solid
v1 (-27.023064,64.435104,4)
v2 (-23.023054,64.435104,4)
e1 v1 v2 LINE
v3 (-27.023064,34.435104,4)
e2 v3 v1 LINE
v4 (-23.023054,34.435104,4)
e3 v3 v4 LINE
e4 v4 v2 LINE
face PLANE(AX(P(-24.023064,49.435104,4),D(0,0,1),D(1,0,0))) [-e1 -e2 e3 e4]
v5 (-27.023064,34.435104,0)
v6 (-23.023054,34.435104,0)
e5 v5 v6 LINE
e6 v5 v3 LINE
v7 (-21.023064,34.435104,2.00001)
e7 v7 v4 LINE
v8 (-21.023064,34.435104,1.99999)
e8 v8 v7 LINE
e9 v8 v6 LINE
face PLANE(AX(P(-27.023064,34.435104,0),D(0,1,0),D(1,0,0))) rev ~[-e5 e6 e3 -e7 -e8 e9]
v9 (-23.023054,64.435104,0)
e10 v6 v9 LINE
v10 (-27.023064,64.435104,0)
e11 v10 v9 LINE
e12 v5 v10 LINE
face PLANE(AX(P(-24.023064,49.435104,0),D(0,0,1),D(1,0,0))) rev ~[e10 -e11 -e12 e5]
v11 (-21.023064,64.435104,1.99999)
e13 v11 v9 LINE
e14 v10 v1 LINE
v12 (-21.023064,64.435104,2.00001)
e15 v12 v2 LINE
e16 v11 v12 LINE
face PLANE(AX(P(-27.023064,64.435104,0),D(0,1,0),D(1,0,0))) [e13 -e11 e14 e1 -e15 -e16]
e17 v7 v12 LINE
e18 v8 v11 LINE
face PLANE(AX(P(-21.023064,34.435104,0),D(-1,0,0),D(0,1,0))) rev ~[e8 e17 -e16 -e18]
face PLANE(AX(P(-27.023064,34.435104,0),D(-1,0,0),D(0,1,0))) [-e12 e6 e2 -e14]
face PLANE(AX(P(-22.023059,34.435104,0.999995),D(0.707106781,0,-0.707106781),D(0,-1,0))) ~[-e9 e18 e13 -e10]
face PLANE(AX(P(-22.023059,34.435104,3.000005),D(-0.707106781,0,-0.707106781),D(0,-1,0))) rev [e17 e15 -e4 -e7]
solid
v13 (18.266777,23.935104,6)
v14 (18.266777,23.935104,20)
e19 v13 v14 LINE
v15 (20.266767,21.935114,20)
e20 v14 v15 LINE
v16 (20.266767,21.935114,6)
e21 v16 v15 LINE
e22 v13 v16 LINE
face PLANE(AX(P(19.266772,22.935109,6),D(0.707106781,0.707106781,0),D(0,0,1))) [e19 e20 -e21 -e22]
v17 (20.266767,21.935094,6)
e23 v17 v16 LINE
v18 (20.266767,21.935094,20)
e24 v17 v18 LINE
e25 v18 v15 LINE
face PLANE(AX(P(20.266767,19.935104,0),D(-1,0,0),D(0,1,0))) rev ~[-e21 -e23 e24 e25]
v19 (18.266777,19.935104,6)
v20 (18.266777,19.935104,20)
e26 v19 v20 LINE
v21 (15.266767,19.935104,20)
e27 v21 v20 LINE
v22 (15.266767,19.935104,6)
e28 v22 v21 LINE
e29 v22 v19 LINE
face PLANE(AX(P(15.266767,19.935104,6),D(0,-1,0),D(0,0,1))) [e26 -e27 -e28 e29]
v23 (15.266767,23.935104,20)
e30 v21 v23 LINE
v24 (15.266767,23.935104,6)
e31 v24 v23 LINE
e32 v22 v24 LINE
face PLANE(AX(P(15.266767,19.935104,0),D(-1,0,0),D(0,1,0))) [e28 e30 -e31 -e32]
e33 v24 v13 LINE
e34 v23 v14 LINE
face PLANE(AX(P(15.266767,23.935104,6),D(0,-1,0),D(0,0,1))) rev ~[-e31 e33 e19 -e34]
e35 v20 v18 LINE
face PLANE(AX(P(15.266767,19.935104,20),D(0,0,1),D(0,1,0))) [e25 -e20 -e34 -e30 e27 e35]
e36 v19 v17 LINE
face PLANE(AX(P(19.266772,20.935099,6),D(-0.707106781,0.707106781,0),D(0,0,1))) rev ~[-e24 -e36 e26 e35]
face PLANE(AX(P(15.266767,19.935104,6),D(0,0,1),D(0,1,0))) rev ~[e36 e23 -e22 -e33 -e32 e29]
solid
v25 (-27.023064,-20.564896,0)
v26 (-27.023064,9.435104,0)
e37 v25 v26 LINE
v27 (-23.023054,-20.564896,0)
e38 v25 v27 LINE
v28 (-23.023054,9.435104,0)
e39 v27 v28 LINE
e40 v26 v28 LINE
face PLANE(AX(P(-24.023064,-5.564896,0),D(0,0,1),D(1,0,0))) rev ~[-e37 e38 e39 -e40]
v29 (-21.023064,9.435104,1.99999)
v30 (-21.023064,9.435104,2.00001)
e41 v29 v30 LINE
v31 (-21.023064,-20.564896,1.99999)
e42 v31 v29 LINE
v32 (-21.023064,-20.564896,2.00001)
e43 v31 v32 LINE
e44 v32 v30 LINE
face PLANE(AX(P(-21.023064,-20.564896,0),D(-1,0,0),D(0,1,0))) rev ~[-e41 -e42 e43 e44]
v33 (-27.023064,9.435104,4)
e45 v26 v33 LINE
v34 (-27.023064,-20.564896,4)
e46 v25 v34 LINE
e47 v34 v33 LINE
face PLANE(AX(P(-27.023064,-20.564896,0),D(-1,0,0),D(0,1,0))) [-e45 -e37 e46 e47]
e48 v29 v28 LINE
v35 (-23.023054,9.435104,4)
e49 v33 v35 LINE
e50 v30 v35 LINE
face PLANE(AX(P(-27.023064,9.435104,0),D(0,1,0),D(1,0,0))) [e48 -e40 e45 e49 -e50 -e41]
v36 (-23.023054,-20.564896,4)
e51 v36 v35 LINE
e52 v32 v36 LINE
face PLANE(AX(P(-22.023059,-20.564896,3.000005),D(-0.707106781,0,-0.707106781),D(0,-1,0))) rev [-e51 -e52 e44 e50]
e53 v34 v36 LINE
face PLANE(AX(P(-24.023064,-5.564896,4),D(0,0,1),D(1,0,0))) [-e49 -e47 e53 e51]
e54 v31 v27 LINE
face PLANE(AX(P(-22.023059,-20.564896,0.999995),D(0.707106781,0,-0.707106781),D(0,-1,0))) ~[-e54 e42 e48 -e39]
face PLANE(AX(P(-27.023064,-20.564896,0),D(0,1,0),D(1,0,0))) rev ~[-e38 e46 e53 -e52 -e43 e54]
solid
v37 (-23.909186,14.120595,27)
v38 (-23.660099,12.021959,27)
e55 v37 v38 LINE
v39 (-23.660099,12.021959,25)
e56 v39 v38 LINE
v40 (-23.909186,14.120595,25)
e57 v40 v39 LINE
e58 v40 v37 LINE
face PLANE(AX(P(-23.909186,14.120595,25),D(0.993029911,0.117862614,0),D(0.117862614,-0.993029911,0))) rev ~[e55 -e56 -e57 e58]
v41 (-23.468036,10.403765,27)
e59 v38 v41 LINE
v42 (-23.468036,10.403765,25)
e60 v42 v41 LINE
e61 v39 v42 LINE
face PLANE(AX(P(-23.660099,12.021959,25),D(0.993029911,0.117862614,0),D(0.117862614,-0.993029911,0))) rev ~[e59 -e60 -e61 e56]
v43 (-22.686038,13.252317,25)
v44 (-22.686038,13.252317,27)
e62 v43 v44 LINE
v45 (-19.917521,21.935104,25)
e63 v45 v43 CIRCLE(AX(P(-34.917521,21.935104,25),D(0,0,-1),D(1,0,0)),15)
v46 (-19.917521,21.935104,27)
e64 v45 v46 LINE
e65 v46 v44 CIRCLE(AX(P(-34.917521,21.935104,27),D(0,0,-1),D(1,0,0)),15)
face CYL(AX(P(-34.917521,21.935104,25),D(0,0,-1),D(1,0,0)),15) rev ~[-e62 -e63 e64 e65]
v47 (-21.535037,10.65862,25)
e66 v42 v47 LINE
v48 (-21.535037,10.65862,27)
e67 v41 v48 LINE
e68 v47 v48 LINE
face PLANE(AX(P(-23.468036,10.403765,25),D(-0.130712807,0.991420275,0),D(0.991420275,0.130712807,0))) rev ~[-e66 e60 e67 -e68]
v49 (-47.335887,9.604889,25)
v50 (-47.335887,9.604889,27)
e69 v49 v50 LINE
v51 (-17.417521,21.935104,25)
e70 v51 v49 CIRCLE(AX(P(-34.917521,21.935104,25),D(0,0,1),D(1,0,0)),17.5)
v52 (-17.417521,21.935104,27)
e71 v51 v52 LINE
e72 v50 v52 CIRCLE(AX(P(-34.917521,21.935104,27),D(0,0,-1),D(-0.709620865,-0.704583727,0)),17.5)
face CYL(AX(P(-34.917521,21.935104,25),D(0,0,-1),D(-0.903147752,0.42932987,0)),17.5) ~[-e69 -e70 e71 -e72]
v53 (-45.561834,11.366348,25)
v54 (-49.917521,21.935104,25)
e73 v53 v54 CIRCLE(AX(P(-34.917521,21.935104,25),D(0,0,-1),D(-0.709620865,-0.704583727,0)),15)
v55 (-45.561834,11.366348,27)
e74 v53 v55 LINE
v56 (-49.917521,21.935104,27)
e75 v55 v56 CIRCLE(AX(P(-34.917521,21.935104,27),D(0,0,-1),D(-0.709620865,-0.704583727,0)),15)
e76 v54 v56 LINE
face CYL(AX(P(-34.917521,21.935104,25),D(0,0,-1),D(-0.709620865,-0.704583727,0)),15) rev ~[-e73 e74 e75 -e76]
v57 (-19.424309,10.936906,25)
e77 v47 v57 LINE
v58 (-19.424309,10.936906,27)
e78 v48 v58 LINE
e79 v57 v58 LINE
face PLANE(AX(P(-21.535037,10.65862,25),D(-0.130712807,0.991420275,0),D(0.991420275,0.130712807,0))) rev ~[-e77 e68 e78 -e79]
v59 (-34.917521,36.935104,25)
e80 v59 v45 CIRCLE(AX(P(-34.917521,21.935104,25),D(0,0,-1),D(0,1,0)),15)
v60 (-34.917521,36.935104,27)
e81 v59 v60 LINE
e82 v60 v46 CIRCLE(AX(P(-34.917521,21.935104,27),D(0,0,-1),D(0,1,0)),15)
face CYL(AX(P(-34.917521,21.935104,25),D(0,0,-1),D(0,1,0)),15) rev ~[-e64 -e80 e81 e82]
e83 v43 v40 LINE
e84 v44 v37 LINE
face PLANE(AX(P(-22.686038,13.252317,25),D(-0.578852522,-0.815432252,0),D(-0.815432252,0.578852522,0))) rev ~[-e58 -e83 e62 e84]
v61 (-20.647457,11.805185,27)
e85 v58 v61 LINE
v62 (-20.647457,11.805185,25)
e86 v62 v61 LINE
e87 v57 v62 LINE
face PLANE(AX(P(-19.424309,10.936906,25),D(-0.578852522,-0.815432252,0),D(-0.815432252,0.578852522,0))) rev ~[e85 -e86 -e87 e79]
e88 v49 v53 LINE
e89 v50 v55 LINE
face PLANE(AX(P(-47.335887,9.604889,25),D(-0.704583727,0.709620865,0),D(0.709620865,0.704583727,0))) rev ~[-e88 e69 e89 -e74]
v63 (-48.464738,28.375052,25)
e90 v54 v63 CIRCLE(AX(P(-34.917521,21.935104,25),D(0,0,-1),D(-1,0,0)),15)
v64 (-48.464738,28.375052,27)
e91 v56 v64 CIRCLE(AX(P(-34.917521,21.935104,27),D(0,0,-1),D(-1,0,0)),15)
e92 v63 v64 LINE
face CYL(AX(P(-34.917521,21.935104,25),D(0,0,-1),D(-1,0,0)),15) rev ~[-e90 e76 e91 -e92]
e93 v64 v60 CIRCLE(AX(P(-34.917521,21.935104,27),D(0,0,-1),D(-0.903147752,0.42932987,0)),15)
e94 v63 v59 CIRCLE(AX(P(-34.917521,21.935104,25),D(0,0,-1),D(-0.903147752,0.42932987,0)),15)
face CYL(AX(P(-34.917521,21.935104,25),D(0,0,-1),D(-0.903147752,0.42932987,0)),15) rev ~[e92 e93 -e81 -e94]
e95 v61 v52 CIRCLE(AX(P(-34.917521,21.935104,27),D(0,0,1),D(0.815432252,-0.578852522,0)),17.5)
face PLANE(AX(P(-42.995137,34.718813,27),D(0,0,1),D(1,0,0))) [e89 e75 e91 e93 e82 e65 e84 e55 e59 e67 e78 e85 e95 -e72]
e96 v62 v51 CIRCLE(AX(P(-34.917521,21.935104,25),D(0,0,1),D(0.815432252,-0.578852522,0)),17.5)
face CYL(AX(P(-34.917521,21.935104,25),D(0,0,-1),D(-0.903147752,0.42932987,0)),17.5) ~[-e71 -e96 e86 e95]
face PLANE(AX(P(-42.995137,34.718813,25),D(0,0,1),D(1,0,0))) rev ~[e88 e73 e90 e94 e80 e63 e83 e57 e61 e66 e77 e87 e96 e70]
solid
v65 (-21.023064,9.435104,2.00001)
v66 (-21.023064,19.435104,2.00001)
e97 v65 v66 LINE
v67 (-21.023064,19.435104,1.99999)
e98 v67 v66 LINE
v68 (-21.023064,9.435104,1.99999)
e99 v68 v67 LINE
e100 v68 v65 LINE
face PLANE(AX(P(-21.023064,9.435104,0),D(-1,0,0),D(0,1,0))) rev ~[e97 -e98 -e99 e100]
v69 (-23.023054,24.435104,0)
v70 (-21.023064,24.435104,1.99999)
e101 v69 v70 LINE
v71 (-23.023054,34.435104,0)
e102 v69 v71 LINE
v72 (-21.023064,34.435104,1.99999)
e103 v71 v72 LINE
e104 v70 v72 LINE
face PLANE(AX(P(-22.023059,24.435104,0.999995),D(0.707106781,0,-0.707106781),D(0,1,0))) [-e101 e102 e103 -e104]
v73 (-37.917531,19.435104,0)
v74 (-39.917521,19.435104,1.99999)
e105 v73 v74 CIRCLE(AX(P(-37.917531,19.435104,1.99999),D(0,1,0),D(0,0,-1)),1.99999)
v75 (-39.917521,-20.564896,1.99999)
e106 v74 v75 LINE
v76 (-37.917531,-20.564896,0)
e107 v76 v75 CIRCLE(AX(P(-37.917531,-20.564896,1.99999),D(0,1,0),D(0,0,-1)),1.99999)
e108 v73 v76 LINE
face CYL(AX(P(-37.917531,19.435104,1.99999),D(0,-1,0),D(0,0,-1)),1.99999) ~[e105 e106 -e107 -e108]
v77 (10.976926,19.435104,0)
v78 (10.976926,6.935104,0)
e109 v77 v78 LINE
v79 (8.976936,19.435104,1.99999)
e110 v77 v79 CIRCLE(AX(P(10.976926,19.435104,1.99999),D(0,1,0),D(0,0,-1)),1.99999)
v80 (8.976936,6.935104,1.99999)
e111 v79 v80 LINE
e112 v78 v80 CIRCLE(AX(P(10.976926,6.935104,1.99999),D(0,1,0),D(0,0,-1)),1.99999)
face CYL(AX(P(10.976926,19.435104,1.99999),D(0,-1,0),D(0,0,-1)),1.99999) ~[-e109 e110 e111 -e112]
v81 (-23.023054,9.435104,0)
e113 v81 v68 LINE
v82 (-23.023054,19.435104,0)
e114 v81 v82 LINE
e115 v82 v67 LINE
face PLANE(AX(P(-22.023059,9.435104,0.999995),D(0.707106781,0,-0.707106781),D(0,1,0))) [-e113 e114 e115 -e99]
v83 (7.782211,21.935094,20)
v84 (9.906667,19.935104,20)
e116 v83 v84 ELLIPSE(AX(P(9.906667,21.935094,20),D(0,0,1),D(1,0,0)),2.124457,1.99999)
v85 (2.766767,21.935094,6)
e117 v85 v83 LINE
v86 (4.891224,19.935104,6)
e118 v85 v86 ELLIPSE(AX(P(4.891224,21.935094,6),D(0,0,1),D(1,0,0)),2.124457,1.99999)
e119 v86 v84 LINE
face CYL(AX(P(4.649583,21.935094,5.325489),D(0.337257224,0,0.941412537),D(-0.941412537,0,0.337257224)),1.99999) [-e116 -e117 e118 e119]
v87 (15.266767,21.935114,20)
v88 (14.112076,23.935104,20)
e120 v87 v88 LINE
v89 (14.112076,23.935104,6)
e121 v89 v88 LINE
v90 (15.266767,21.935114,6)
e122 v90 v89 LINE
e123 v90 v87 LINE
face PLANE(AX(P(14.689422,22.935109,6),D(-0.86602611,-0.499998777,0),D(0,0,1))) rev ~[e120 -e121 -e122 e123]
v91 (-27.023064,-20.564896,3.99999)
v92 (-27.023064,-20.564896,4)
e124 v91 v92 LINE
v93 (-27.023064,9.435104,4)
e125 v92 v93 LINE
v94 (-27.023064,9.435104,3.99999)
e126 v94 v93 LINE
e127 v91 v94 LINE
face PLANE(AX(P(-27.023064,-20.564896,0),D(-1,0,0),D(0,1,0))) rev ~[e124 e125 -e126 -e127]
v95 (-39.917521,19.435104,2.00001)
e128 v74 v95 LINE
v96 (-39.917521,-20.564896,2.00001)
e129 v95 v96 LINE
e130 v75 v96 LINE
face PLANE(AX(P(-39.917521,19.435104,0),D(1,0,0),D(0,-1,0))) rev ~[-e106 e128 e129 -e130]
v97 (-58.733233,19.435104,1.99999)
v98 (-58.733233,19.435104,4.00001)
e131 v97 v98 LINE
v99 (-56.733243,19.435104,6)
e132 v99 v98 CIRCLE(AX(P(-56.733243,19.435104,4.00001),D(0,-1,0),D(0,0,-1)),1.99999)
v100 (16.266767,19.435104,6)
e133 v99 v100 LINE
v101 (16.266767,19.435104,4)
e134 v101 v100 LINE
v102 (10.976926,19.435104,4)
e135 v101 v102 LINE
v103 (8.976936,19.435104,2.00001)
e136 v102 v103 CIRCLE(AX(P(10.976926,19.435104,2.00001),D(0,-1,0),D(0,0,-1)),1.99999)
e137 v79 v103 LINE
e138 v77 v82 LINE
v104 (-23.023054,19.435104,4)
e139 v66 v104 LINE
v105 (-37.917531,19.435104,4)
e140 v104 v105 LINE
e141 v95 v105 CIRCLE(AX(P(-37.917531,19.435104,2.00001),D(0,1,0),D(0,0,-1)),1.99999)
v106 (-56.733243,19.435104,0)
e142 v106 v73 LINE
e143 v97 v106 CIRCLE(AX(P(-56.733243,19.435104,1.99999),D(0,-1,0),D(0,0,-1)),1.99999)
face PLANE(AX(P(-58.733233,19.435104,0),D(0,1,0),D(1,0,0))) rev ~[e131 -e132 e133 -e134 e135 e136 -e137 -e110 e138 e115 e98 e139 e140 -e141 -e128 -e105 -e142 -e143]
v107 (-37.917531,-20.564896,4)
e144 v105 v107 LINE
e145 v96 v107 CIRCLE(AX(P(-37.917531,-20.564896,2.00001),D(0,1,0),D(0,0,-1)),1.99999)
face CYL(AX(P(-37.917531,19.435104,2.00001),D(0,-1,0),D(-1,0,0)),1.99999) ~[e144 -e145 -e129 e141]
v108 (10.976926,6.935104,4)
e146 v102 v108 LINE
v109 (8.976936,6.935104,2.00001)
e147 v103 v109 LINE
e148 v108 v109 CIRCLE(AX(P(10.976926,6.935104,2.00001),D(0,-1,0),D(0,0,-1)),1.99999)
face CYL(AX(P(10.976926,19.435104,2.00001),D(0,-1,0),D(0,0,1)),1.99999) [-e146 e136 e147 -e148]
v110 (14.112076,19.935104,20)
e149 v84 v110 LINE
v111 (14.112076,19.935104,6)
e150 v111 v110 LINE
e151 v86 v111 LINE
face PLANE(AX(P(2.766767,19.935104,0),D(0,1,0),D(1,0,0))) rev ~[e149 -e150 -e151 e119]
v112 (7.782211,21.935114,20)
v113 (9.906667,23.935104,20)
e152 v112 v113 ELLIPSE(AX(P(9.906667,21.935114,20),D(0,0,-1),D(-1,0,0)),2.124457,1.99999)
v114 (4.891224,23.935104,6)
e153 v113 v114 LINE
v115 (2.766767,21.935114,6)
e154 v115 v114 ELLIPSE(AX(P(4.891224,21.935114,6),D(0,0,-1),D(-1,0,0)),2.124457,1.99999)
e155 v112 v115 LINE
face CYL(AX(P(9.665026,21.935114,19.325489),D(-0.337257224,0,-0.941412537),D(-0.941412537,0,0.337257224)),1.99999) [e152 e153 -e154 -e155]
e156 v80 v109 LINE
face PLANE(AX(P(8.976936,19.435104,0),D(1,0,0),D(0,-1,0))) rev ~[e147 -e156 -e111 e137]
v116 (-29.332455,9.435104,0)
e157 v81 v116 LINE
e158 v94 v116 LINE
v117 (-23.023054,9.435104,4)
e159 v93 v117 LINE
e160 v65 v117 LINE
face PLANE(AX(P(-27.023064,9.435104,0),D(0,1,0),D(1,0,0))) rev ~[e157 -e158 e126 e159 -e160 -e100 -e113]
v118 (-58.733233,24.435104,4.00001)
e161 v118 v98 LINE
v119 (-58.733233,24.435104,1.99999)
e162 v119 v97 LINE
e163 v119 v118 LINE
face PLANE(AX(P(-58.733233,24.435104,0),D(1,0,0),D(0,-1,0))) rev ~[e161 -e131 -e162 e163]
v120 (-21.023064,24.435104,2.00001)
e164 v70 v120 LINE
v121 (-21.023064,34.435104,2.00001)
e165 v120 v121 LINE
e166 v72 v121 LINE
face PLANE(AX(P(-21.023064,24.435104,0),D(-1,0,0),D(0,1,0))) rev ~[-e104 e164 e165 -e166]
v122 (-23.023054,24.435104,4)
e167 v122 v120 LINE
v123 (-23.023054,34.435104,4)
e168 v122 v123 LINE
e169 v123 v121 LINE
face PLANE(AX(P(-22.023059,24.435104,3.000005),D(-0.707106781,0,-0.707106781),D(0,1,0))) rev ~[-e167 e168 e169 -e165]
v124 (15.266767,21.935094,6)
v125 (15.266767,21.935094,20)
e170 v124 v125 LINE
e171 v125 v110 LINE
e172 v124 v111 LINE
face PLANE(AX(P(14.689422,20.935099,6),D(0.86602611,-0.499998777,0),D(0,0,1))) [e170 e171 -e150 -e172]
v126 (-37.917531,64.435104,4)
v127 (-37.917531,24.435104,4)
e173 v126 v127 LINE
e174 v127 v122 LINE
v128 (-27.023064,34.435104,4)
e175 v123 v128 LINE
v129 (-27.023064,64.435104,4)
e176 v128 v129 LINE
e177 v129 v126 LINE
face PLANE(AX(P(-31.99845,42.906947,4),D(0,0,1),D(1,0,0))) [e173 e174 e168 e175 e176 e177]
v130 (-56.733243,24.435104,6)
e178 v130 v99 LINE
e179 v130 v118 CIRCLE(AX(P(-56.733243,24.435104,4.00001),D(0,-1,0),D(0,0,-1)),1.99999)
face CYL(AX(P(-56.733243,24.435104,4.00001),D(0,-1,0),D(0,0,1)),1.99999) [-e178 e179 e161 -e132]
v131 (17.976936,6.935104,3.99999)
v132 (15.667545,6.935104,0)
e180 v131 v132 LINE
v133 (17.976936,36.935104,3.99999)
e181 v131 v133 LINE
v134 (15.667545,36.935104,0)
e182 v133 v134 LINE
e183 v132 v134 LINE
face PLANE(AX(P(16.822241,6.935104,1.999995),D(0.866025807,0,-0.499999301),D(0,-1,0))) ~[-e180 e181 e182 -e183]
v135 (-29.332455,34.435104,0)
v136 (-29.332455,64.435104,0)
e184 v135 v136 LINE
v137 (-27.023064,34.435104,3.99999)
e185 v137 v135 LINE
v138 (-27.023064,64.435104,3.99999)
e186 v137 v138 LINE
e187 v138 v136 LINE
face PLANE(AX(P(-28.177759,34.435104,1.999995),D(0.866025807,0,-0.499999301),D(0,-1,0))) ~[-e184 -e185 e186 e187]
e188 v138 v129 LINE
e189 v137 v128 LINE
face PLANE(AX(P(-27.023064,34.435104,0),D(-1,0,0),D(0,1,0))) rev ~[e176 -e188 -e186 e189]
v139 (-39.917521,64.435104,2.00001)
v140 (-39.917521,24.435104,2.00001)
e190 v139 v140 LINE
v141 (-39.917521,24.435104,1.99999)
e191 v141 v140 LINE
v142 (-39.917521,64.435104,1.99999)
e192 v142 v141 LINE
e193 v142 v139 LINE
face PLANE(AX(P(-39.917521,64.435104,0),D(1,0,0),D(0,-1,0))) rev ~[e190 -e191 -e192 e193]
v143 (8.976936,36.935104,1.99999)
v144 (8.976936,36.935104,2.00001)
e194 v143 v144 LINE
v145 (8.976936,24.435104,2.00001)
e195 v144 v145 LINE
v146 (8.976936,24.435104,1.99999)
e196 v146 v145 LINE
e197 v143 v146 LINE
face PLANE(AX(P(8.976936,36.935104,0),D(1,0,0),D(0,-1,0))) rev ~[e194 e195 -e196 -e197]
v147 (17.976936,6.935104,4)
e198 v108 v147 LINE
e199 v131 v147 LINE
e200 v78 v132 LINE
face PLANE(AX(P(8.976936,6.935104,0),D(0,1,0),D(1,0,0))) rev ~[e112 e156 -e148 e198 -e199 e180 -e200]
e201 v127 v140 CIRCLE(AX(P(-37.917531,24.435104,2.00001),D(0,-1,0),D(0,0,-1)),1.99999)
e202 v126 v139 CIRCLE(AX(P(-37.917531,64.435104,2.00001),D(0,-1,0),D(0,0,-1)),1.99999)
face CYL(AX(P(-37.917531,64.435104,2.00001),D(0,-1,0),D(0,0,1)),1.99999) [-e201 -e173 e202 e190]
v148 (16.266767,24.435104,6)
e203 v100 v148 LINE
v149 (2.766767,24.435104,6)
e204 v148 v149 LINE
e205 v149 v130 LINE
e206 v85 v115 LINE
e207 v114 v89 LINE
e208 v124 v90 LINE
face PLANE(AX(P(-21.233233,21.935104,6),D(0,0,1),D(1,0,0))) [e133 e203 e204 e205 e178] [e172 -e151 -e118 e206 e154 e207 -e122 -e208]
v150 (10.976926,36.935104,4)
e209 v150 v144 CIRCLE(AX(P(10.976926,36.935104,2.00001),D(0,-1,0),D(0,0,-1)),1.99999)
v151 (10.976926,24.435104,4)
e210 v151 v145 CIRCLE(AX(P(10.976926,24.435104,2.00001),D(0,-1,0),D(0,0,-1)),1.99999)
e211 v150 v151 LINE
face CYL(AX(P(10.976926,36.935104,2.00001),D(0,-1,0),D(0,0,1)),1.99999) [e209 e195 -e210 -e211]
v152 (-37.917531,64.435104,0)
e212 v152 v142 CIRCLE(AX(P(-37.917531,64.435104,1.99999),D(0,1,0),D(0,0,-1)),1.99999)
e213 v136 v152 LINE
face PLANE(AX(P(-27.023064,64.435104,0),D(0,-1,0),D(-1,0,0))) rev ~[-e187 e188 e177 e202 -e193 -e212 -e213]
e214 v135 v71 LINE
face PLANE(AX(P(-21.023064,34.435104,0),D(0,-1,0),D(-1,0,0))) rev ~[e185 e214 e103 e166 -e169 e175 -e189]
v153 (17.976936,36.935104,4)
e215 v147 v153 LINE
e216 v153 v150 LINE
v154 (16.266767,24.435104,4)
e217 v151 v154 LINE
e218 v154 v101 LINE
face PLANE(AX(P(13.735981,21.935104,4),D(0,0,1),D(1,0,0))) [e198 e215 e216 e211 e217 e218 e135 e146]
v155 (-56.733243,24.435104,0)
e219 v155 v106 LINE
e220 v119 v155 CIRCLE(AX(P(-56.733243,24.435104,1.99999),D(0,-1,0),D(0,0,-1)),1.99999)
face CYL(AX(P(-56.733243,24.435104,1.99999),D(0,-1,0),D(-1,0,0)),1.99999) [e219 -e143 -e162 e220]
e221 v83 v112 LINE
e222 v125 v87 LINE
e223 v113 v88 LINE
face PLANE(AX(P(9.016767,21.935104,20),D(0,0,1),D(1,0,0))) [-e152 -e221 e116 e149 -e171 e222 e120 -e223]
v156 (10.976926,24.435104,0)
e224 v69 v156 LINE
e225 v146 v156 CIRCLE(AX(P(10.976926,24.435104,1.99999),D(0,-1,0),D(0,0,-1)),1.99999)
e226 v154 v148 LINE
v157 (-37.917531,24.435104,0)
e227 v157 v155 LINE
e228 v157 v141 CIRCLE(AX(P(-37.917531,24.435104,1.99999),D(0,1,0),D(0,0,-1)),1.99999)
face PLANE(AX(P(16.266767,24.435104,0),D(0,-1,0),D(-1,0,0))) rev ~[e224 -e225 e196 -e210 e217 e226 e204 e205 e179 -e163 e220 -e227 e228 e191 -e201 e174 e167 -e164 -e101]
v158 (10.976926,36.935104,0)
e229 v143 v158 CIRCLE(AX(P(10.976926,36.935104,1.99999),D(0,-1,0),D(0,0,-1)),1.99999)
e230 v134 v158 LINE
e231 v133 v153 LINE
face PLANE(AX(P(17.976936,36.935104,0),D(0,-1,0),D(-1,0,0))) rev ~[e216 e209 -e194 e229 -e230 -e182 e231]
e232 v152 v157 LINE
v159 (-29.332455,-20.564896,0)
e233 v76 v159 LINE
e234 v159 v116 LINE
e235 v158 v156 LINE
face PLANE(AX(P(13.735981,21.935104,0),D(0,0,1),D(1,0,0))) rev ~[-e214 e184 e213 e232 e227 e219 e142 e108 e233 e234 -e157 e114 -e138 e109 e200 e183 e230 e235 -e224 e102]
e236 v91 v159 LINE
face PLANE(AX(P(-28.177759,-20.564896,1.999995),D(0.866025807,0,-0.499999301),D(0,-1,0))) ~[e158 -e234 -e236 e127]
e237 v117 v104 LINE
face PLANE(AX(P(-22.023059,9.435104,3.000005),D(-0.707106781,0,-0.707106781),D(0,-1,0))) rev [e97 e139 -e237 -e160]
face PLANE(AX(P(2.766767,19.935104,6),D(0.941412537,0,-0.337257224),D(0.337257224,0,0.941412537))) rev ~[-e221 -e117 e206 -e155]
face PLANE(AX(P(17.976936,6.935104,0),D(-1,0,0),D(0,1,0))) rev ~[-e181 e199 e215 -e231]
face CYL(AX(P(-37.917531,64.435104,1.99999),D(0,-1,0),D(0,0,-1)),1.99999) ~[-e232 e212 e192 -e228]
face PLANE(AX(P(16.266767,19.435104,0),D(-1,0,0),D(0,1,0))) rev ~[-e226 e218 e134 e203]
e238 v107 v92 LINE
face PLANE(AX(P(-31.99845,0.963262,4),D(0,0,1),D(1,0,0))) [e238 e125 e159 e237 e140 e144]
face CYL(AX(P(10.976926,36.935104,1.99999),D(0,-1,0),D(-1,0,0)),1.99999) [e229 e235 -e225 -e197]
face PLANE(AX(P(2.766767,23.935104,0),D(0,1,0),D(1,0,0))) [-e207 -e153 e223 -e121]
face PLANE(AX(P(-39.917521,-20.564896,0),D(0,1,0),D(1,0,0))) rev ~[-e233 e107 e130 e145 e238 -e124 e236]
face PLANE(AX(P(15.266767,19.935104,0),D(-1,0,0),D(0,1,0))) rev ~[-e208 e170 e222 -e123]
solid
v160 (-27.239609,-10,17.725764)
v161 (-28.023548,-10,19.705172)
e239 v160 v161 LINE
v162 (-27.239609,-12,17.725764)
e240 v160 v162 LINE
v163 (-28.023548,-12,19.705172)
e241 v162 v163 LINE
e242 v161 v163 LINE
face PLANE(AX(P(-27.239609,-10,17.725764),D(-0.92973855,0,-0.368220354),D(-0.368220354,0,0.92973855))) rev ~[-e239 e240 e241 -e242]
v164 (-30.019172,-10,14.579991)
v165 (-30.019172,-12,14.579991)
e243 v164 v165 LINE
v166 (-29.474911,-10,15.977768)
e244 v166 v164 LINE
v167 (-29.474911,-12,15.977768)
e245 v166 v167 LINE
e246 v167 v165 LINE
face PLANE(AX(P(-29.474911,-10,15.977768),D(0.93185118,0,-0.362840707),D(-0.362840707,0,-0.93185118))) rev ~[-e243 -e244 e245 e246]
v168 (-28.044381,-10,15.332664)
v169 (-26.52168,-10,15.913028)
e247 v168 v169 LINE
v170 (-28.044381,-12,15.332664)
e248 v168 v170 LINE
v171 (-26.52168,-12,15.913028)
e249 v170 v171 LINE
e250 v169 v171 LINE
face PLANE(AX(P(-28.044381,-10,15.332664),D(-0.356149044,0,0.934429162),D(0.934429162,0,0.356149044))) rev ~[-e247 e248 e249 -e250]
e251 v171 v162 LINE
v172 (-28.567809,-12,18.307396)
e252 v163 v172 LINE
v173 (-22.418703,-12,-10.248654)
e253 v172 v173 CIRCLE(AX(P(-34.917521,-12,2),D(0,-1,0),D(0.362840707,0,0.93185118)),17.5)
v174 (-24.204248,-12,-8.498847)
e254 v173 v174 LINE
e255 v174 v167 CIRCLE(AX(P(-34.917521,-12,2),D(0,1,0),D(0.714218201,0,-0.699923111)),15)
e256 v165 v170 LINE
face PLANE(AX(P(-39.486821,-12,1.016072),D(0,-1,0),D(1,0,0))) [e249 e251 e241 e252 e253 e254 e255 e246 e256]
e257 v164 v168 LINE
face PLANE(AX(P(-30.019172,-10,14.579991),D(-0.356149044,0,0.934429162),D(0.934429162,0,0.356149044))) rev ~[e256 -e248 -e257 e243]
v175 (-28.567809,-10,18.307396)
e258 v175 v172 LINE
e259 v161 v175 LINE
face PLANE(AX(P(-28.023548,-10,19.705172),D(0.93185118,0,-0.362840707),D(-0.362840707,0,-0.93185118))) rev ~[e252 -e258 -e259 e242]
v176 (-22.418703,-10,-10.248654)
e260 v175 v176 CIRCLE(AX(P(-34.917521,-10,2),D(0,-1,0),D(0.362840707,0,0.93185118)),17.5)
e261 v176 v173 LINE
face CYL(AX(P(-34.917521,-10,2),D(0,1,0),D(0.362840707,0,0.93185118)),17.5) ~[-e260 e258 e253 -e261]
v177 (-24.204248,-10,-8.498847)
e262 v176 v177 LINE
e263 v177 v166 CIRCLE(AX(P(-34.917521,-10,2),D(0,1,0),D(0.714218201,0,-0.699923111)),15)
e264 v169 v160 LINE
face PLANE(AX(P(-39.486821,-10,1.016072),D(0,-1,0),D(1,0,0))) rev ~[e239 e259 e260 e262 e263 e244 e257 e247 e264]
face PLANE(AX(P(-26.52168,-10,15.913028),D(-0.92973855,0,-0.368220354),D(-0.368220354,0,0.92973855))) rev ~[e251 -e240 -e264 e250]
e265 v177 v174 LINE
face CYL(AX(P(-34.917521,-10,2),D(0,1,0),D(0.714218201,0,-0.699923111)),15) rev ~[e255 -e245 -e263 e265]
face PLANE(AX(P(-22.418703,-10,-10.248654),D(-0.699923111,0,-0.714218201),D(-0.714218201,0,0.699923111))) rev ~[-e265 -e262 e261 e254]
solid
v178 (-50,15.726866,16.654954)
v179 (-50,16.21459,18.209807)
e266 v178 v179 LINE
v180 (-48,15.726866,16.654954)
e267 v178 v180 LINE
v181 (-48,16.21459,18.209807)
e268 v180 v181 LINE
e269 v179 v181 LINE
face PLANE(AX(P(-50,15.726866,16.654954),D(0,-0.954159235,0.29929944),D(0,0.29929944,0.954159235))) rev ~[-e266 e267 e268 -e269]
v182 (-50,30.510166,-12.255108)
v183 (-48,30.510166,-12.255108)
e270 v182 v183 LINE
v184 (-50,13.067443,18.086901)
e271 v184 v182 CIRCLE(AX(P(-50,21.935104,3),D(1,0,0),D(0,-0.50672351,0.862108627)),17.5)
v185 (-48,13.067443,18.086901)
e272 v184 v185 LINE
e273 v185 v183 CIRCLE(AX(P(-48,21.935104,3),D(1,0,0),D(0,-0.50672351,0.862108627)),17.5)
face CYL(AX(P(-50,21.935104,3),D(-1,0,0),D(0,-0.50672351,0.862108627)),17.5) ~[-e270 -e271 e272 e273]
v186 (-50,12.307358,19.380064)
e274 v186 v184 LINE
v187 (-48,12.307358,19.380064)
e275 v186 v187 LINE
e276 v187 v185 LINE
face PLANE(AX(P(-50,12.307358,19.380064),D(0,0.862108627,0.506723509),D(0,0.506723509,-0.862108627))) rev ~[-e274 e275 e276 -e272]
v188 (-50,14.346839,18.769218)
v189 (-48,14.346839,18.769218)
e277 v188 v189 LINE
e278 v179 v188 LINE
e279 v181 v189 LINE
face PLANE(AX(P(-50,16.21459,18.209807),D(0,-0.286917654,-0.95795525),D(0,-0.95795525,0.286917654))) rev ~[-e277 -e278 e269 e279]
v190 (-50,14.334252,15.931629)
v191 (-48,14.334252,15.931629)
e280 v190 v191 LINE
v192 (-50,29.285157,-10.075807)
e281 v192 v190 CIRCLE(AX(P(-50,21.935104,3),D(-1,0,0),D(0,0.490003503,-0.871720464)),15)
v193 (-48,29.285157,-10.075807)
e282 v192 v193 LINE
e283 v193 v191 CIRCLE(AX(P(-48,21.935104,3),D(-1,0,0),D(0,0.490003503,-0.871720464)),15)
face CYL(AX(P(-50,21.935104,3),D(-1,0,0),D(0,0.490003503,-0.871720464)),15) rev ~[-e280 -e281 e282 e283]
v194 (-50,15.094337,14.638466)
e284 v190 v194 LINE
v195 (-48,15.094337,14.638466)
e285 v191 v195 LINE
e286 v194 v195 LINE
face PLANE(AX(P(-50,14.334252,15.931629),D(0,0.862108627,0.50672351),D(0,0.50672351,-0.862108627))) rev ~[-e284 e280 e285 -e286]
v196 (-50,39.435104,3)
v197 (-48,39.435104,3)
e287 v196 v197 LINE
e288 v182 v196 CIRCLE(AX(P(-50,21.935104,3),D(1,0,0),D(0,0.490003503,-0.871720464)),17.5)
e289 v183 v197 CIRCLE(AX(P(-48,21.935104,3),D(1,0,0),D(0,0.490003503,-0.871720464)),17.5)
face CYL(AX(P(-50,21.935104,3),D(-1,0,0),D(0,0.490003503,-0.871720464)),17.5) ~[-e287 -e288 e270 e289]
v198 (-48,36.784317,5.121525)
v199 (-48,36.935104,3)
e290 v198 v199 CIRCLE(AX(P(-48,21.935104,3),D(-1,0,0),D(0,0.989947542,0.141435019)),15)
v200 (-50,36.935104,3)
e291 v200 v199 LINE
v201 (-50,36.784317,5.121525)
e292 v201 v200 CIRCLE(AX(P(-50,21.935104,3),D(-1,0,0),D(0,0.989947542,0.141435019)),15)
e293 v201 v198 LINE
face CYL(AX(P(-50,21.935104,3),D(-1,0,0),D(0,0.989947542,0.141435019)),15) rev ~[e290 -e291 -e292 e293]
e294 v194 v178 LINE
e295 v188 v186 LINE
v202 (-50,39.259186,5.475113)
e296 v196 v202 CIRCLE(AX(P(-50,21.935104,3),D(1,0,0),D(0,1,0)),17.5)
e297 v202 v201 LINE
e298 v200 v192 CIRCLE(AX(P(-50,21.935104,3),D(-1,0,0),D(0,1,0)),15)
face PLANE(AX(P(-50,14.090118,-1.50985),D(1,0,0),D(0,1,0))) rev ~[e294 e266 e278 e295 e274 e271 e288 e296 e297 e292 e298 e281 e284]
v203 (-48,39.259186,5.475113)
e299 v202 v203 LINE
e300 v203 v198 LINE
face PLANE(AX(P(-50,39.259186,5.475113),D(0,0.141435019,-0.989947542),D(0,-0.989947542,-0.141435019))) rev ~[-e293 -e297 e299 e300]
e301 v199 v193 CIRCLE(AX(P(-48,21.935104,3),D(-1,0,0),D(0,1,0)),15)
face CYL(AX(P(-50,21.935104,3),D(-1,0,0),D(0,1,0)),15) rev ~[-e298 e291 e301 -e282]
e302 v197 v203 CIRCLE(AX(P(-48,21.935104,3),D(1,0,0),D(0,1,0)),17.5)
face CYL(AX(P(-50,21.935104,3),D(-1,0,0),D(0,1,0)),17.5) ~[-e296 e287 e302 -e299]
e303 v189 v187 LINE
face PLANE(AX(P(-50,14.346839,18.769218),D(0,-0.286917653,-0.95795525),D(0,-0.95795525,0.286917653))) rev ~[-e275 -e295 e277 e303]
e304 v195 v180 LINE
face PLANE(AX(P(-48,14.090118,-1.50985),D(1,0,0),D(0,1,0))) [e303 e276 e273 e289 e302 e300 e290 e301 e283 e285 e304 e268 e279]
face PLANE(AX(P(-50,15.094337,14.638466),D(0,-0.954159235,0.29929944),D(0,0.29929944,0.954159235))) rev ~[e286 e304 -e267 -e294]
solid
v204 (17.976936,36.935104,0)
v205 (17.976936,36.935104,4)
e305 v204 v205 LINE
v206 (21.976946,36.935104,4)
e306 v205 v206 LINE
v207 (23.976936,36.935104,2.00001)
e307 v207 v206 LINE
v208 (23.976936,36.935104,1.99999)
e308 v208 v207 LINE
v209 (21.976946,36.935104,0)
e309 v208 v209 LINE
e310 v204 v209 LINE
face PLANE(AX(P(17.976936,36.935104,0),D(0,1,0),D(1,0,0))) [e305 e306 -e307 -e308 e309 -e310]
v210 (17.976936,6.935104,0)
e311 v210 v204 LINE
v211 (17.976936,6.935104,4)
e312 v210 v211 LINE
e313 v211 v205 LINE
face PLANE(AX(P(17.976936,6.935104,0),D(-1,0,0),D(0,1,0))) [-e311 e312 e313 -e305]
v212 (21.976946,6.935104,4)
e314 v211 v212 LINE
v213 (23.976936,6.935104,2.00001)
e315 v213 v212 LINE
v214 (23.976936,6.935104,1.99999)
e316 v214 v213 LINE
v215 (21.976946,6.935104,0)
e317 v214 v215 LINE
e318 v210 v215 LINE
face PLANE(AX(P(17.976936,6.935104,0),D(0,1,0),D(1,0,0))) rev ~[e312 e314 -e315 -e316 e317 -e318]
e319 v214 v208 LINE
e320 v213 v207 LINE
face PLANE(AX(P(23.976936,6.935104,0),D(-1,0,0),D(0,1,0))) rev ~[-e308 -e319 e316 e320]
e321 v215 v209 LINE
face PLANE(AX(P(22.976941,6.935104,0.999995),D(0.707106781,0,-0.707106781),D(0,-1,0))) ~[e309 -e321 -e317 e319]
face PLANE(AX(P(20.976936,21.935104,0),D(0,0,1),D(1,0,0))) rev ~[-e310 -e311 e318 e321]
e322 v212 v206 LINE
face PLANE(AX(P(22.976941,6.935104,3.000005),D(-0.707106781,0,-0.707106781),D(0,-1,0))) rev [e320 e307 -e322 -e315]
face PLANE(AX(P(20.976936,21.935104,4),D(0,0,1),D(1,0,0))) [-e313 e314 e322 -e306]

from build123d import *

# Parameters (mm, degrees)
F0_W        = 12.5
F0_H        = 4
F1_DEPTH    = 6
F2_DEPTH    = 4
F0_W_2      = 6
F0_H_2      = 30
F3_DEPTH    = 4
F4_DEPTH    = 20
F7_DEPTH    = 25
F8_DEPTH    = 5
F9_R        = 1.99999
F10_SIZE    = 1.99999
F10_2_SIZE  = 1.99999
F10_3_SIZE  = 1.99999
F10_4_SIZE  = 1.99999
F10_5_SIZE  = 1.99999
F11_SIZE2   = 2.309391
F11_SIZE    = 3.99999
F11_2_SIZE2 = 2.309391
F11_2_SIZE  = 3.99999
F11_3_SIZE2 = 2.309391
F11_3_SIZE  = 3.99999
F12_SIZE2   = 1.154691
F12_SIZE    = 1.99999
F15_DEPTH   = 2
F18_DEPTH   = 2
F21_DEPTH   = 2


# Not quite as in the source:
# - a fillet or chamfer is up to 0.001 mm smaller than in the source, because OpenCascade refuses the exact size


with BuildPart() as f1:
    # F0 (on Top) → F1 (new body)
    with BuildSketch(Plane.XY):
        Polygon((-58.7332326337, 24.4351043343), (-58.7332326337, 19.4351043343), (-39.9175214512, 19.4351043343), (-21.0230639726, 19.4351043343), (8.9769360274, 19.4351043343), (16.2667673663, 19.4351043343), (16.2667673663, 24.4351043343), (8.9769360274, 24.4351043343), (-21.0230639726, 24.4351043343), (-39.9175214512, 24.4351043343), align=None)
        with Locations((9.0167673663, 21.9351043343)):
            Rectangle(F0_W, F0_H, mode=Mode.SUBTRACT)
    extrude(amount=F1_DEPTH)

    # F0 (on Top) → F2 (join)
    with BuildSketch(Plane.XY):
        Polygon((-21.0230639726, 19.4351043343), (-39.9175214512, 19.4351043343), (-39.9175214512, -20.5648956657), (-27.0230639726, -20.5648956657), (-27.0230639726, 9.4351043343), (-21.0230639726, 9.4351043343), align=None)
        Polygon((-39.9175214512, 64.4351043343), (-39.9175214512, 24.4351043343), (-21.0230639726, 24.4351043343), (-21.0230639726, 34.4351043343), (-27.0230639726, 34.4351043343), (-27.0230639726, 64.4351043343), align=None)
        Polygon((16.2667673663, 19.4351043343), (8.9769360274, 19.4351043343), (8.9769360274, 6.9351043343), (17.9769360274, 6.9351043343), (17.9769360274, 36.9351043343), (8.9769360274, 36.9351043343), (8.9769360274, 24.4351043343), (16.2667673663, 24.4351043343), align=None)
    extrude(amount=F2_DEPTH)

    # F0 (on Top) → F4 (join)
    with BuildSketch(Plane.XY):
        with Locations((9.0167673663, 21.9351043343)):
            Rectangle(F0_W, F0_H)
    extrude(amount=F4_DEPTH)

    # F6 (on offset) → F7 (cut)
    with BuildSketch(Plane.XZ.offset(-19.9351043343)):
        Polygon((7.7822105959, 20), (2.7667673663, 20), (2.7667673663, 6), align=None)
    extrude(amount=-F7_DEPTH, mode=Mode.SUBTRACT)


with BuildPart() as f3:
    # F0 (on Top) → F3 (new body)
    with BuildSketch(Plane.XY):
        with Locations((-24.0230639726, -5.5648956657)):
            Rectangle(F0_W_2, F0_H_2)
    extrude(amount=F3_DEPTH)

    # F10#2 (size 2 in the source; OpenCascade refuses exactly that, so slightly less here)
    f10_2_edges = [f3.edges().sort_by_distance(p)[0] for p in [
        (-21.023064, -5.564896, 4),
        (-21.023064, -5.564896, 0),
    ]]
    chamfer(f10_2_edges, length=F10_2_SIZE)


with BuildPart() as f3b:
    # F0 (on Top) → F3, piece 2 (new body)
    with BuildSketch(Plane.XY):
        with Locations((-24.0230639726, 49.4351043343)):
            Rectangle(F0_W_2, F0_H_2)
    extrude(amount=F3_DEPTH)

    # F10#3 (size 2 in the source; OpenCascade refuses exactly that, so slightly less here)
    f10_3_edges = [f3b.edges().sort_by_distance(p)[0] for p in [
        (-21.023064, 49.435104, 4),
        (-21.023064, 49.435104, 0),
    ]]
    chamfer(f10_3_edges, length=F10_3_SIZE)


with BuildPart() as f3c:
    # F0 (on Top) → F3, piece 3 (new body)
    with BuildSketch(Plane.XY):
        with Locations((20.9769360274, 21.9351043343)):
            Rectangle(F0_W_2, F0_H_2)
    extrude(amount=F3_DEPTH)

    # F10#4 (size 2 in the source; OpenCascade refuses exactly that, so slightly less here)
    f10_4_edges = [f3c.edges().sort_by_distance(p)[0] for p in [
        (23.976936, 21.935104, 4),
        (23.976936, 21.935104, 0),
    ]]
    chamfer(f10_4_edges, length=F10_4_SIZE)


with BuildPart() as f8:
    # F8 (new): a face of the model
    f8_faces = [f1.part.faces().sort_by_distance(p)[0] for p in [
        (15.2667673663, 21.9351043343, 13),
    ]]
    extrude(f8_faces, amount=F8_DEPTH)

    # F10#5 (size 2 in the source; OpenCascade refuses exactly that, so slightly less here)
    f10_5_edges = [f8.edges().sort_by_distance(p)[0] for p in [
        (20.266767, 19.935104, 13),
        (20.266767, 23.935104, 13),
    ]]
    chamfer(f10_5_edges, length=F10_5_SIZE)


with BuildPart() as f1_1:
    add(f1.part)

    # F9 (radius 2 in the source; OpenCascade refuses exactly that, so slightly less here)
    f9_edges = [f1_1.edges().sort_by_distance(p)[0] for p in [
        (-39.917521, -0.564896, 4),
        (-39.917521, 44.435104, 4),
        (8.976936, 13.185104, 4),
        (-39.917521, -0.564896, 0),
        (-39.917521, 44.435104, 0),
        (8.976936, 13.185104, 0),
        (-58.733233, 21.935104, 6),
        (-58.733233, 21.935104, 0),
        (8.976936, 30.685104, 4),
        (8.976936, 30.685104, 0),
        (5.274489, 19.935104, 13),
        (5.274489, 23.935104, 13),
    ]]
    fillet(f9_edges, radius=F9_R)

    # F10 (size 2 in the source; OpenCascade refuses exactly that, so slightly less here)
    f10_edges = [f1_1.edges().sort_by_distance(p)[0] for p in [
        (-21.023064, 14.435104, 4),
        (-21.023064, 29.435104, 4),
        (-21.023064, 14.435104, 0),
        (-21.023064, 29.435104, 0),
    ]]
    chamfer(f10_edges, length=F10_SIZE)

    # F11 (size 4 and 2.3094010768 in the source; OpenCascade refuses exactly that, so slightly less here)
    f11_edges = [f1_1.edges().sort_by_distance(p)[0] for p in [
        (-27.023064, -5.564896, 0),
    ]]
    f11_side = f1_1.faces().sort_by_distance((-27.023064, -5.564896, 2))[0]
    chamfer(f11_edges, length=F11_SIZE, length2=F11_SIZE2, reference=f11_side)

    # F11#2 (size 4 and 2.3094010768 in the source; OpenCascade refuses exactly that, so slightly less here)
    f11_2_edges = [f1_1.edges().sort_by_distance(p)[0] for p in [
        (-27.023064, 49.435104, 0),
    ]]
    f11_2_side = f1_1.faces().sort_by_distance((-27.023064, 49.435104, 2))[0]
    chamfer(f11_2_edges, length=F11_2_SIZE, length2=F11_2_SIZE2, reference=f11_2_side)

    # F11#3 (size 4 and 2.3094010768 in the source; OpenCascade refuses exactly that, so slightly less here)
    f11_3_edges = [f1_1.edges().sort_by_distance(p)[0] for p in [
        (17.976936, 21.935104, 0),
    ]]
    f11_3_side = f1_1.faces().sort_by_distance((17.976936, 21.935104, 2))[0]
    chamfer(f11_3_edges, length=F11_3_SIZE, length2=F11_3_SIZE2, reference=f11_3_side)

    # F12 (size 2 and 1.1547005384 in the source; OpenCascade refuses exactly that, so slightly less here)
    f12_edges = [f1_1.edges().sort_by_distance(p)[0] for p in [
        (15.266767, 19.935104, 13),
        (15.266767, 23.935104, 13),
    ]]
    f12_side = f1_1.faces().sort_by_distance((15.266767, 21.935104, 13))[0]
    chamfer(f12_edges, length=F12_SIZE, length2=F12_SIZE2, reference=f12_side)


with BuildPart() as f15:
    # F14 (on offset) → F15 (new body)
    with BuildSketch(Plane.YZ.offset(-50)):
        with BuildLine():
            Line((30.5101656349, -12.2551081179), (29.2851568777, -10.0758069582))
            ThreePointArc((29.2851568777, -10.0758069582), (8.9307815246, -4.4758001753), (14.3342516917, 15.9316294065))
            Line((14.3342516917, 15.9316294065), (13.0674429179, 18.0869009742))
            ThreePointArc((13.0674429179, 18.0869009742), (6.7633943897, -5.7217668712), (30.5101656349, -12.2551081179))
        make_face()
        with BuildLine():
            ThreePointArc((14.3342516917, 15.9316294065), (15.0210934818, 16.311515839), (15.7268663052, 16.6549544333))
            Line((15.7268663052, 16.6549544333), (16.2145903627, 18.2098067016))
            Line((16.2145903627, 18.2098067016), (14.3468390864, 18.769217816))
            ThreePointArc((14.3468390864, 18.769217816), (13.7000712643, 18.4413156932), (13.0674429179, 18.0869009742))
            Line((13.0674429179, 18.0869009742), (14.3342516917, 15.9316294065))
        make_face()
        with BuildLine():
            Line((14.3342516917, 15.9316294065), (15.094336956, 14.6384664658))
            Line((15.094336956, 14.6384664658), (15.7268663052, 16.6549544333))
            ThreePointArc((15.7268663052, 16.6549544333), (15.0210934818, 16.311515839), (14.3342516917, 15.9316294065))
        make_face()
        with BuildLine():
            ThreePointArc((13.0674429179, 18.0869009742), (13.7000712643, 18.4413156932), (14.3468390864, 18.769217816))
            Line((14.3468390864, 18.769217816), (12.3073576537, 19.3800639148))
            Line((12.3073576537, 19.3800639148), (13.0674429179, 18.0869009742))
        make_face()
        with BuildLine():
            Line((39.259186316, 5.4751128239), (36.7843174615, 5.1215252776))
            ThreePointArc((36.7843174615, 5.1215252776), (36.8973601286, 4.0634385484), (36.9351043343, 3))
            ThreePointArc((36.9351043343, 3), (34.8821269293, -4.5746026909), (29.2851568777, -10.0758069582))
            Line((29.2851568777, -10.0758069582), (30.5101656349, -12.2551081179))
            ThreePointArc((30.5101656349, -12.2551081179), (37.0399640285, -5.8370364727), (39.4351043343, 3))
            ThreePointArc((39.4351043343, 3), (39.3910694276, 4.2406783064), (39.259186316, 5.4751128239))
        make_face()
    extrude(amount=F15_DEPTH)


with BuildPart() as f18:
    # F17 (on offset) → F18 (new body)
    with BuildSketch(Plane.XZ.offset(10)):
        with BuildLine():
            Line((-22.4187029305, -10.2486544399), (-24.2042484335, -8.4988466628))
            ThreePointArc((-24.2042484335, -8.4988466628), (-49.5813990611, -1.1576404862), (-29.4749108405, 15.9777676952))
            Line((-29.4749108405, 15.9777676952), (-28.5678090721, 18.3073956444))
            ThreePointArc((-28.5678090721, 18.3073956444), (-52.0253786628, -1.6839139005), (-22.4187029305, -10.2486544399))
        make_face()
        with BuildLine():
            Line((-28.5678090721, 18.3073956444), (-29.4749108405, 15.9777676952))
            ThreePointArc((-29.4749108405, 15.9777676952), (-28.751203924, 15.6739360886), (-28.0443808054, 15.3326643123))
            Line((-28.0443808054, 15.3326643123), (-26.5216797206, 15.9130277666))
            Line((-26.5216797206, 15.9130277666), (-27.2396089112, 17.7257641795))
            ThreePointArc((-27.2396089112, 17.7257641795), (-27.8976824924, 18.0303418863), (-28.5678090721, 18.3073956444))
        make_face()
        with BuildLine():
            ThreePointArc((-28.0443808054, 15.3326643123), (-28.751203924, 15.6739360886), (-29.4749108405, 15.9777676952))
            Line((-29.4749108405, 15.9777676952), (-30.0191719016, 14.5799909257))
            Line((-30.0191719016, 14.5799909257), (-28.0443808054, 15.3326643123))
        make_face()
        with BuildLine():
            Line((-28.023548011, 19.7051724139), (-28.5678090721, 18.3073956444))
            ThreePointArc((-28.5678090721, 18.3073956444), (-27.8976824924, 18.0303418863), (-27.2396089112, 17.7257641795))
            Line((-27.2396089112, 17.7257641795), (-28.023548011, 19.7051724139))
        make_face()
    extrude(amount=F18_DEPTH)


with BuildPart() as f21:
    # F20 (on offset) → F21 (new body)
    with BuildSketch(Plane.XY.offset(25)):
        with BuildLine():
            ThreePointArc((-34.9175214512, 39.4351043343), (-44.2654551052, 36.729229398), (-50.7226071157, 29.4483770657))
            Line((-50.7226071157, 29.4483770657), (-48.4647377351, 28.3750523898))
            ThreePointArc((-48.4647377351, 28.3750523898), (-42.9300360118, 34.6157829603), (-34.9175214512, 36.9351043343))
            Line((-34.9175214512, 36.9351043343), (-34.9175214512, 39.4351043343))
        make_face()
        with BuildLine():
            Line((-22.686037665, 13.2523165108), (-23.9091860436, 14.1205952931))
            Line((-23.9091860436, 14.1205952931), (-23.6600991667, 12.0219593484))
            ThreePointArc((-23.6600991667, 12.0219593484), (-23.1569678169, 12.6243912459), (-22.686037665, 13.2523165108))
        make_face()
        with BuildLine():
            Line((-23.4680358856, 10.4037652844), (-21.5350369428, 10.6586195813))
            ThreePointArc((-21.5350369428, 10.6586195813), (-21.0793669968, 11.2227058495), (-20.6474570339, 11.8051852068))
            Line((-20.6474570339, 11.8051852068), (-22.686037665, 13.2523165108))
            ThreePointArc((-22.686037665, 13.2523165108), (-23.1569678169, 12.6243912459), (-23.6600991667, 12.0219593484))
            Line((-23.6600991667, 12.0219593484), (-23.4680358856, 10.4037652844))
        make_face()
        with BuildLine():
            ThreePointArc((-20.6474570339, 11.8051852068), (-21.0793669968, 11.2227058495), (-21.5350369428, 10.6586195813))
            Line((-21.5350369428, 10.6586195813), (-19.4243086553, 10.9369064245))
            Line((-19.4243086553, 10.9369064245), (-20.6474570339, 11.8051852068))
        make_face()
        with BuildLine():
            ThreePointArc((-50.7226071157, 29.4483770657), (-52.168080783, 18.9909231681), (-47.3358865818, 9.6048891098))
            Line((-47.3358865818, 9.6048891098), (-45.5618344203, 11.3663484276))
            ThreePointArc((-45.5618344203, 11.3663484276), (-48.7859152755, 16.2195420057), (-49.9175214512, 21.9351043343))
            ThreePointArc((-49.9175214512, 21.9351043343), (-49.5498186778, 25.2359948006), (-48.4647377351, 28.3750523898))
            Line((-48.4647377351, 28.3750523898), (-50.7226071157, 29.4483770657))
        make_face()
        with BuildLine():
            Line((-34.9175214512, 39.4351043343), (-34.9175214512, 36.9351043343))
            ThreePointArc((-34.9175214512, 36.9351043343), (-24.3109197334, 32.5417060521), (-19.9175214512, 21.9351043343))
            ThreePointArc((-19.9175214512, 21.9351043343), (-20.6264008374, 17.3783651928), (-22.686037665, 13.2523165108))
            Line((-22.686037665, 13.2523165108), (-20.6474570339, 11.8051852068))
            ThreePointArc((-20.6474570339, 11.8051852068), (-18.2445474018, 16.6189086692), (-17.4175214512, 21.9351043343))
            ThreePointArc((-17.4175214512, 21.9351043343), (-22.5431527804, 34.309473005), (-34.9175214512, 39.4351043343))
        make_face()
    extrude(amount=F21_DEPTH)


solid = Compound([f3.part, f3b.part, f3c.part, f8.part, f1_1.part, f15.part, f18.part, f21.part])
